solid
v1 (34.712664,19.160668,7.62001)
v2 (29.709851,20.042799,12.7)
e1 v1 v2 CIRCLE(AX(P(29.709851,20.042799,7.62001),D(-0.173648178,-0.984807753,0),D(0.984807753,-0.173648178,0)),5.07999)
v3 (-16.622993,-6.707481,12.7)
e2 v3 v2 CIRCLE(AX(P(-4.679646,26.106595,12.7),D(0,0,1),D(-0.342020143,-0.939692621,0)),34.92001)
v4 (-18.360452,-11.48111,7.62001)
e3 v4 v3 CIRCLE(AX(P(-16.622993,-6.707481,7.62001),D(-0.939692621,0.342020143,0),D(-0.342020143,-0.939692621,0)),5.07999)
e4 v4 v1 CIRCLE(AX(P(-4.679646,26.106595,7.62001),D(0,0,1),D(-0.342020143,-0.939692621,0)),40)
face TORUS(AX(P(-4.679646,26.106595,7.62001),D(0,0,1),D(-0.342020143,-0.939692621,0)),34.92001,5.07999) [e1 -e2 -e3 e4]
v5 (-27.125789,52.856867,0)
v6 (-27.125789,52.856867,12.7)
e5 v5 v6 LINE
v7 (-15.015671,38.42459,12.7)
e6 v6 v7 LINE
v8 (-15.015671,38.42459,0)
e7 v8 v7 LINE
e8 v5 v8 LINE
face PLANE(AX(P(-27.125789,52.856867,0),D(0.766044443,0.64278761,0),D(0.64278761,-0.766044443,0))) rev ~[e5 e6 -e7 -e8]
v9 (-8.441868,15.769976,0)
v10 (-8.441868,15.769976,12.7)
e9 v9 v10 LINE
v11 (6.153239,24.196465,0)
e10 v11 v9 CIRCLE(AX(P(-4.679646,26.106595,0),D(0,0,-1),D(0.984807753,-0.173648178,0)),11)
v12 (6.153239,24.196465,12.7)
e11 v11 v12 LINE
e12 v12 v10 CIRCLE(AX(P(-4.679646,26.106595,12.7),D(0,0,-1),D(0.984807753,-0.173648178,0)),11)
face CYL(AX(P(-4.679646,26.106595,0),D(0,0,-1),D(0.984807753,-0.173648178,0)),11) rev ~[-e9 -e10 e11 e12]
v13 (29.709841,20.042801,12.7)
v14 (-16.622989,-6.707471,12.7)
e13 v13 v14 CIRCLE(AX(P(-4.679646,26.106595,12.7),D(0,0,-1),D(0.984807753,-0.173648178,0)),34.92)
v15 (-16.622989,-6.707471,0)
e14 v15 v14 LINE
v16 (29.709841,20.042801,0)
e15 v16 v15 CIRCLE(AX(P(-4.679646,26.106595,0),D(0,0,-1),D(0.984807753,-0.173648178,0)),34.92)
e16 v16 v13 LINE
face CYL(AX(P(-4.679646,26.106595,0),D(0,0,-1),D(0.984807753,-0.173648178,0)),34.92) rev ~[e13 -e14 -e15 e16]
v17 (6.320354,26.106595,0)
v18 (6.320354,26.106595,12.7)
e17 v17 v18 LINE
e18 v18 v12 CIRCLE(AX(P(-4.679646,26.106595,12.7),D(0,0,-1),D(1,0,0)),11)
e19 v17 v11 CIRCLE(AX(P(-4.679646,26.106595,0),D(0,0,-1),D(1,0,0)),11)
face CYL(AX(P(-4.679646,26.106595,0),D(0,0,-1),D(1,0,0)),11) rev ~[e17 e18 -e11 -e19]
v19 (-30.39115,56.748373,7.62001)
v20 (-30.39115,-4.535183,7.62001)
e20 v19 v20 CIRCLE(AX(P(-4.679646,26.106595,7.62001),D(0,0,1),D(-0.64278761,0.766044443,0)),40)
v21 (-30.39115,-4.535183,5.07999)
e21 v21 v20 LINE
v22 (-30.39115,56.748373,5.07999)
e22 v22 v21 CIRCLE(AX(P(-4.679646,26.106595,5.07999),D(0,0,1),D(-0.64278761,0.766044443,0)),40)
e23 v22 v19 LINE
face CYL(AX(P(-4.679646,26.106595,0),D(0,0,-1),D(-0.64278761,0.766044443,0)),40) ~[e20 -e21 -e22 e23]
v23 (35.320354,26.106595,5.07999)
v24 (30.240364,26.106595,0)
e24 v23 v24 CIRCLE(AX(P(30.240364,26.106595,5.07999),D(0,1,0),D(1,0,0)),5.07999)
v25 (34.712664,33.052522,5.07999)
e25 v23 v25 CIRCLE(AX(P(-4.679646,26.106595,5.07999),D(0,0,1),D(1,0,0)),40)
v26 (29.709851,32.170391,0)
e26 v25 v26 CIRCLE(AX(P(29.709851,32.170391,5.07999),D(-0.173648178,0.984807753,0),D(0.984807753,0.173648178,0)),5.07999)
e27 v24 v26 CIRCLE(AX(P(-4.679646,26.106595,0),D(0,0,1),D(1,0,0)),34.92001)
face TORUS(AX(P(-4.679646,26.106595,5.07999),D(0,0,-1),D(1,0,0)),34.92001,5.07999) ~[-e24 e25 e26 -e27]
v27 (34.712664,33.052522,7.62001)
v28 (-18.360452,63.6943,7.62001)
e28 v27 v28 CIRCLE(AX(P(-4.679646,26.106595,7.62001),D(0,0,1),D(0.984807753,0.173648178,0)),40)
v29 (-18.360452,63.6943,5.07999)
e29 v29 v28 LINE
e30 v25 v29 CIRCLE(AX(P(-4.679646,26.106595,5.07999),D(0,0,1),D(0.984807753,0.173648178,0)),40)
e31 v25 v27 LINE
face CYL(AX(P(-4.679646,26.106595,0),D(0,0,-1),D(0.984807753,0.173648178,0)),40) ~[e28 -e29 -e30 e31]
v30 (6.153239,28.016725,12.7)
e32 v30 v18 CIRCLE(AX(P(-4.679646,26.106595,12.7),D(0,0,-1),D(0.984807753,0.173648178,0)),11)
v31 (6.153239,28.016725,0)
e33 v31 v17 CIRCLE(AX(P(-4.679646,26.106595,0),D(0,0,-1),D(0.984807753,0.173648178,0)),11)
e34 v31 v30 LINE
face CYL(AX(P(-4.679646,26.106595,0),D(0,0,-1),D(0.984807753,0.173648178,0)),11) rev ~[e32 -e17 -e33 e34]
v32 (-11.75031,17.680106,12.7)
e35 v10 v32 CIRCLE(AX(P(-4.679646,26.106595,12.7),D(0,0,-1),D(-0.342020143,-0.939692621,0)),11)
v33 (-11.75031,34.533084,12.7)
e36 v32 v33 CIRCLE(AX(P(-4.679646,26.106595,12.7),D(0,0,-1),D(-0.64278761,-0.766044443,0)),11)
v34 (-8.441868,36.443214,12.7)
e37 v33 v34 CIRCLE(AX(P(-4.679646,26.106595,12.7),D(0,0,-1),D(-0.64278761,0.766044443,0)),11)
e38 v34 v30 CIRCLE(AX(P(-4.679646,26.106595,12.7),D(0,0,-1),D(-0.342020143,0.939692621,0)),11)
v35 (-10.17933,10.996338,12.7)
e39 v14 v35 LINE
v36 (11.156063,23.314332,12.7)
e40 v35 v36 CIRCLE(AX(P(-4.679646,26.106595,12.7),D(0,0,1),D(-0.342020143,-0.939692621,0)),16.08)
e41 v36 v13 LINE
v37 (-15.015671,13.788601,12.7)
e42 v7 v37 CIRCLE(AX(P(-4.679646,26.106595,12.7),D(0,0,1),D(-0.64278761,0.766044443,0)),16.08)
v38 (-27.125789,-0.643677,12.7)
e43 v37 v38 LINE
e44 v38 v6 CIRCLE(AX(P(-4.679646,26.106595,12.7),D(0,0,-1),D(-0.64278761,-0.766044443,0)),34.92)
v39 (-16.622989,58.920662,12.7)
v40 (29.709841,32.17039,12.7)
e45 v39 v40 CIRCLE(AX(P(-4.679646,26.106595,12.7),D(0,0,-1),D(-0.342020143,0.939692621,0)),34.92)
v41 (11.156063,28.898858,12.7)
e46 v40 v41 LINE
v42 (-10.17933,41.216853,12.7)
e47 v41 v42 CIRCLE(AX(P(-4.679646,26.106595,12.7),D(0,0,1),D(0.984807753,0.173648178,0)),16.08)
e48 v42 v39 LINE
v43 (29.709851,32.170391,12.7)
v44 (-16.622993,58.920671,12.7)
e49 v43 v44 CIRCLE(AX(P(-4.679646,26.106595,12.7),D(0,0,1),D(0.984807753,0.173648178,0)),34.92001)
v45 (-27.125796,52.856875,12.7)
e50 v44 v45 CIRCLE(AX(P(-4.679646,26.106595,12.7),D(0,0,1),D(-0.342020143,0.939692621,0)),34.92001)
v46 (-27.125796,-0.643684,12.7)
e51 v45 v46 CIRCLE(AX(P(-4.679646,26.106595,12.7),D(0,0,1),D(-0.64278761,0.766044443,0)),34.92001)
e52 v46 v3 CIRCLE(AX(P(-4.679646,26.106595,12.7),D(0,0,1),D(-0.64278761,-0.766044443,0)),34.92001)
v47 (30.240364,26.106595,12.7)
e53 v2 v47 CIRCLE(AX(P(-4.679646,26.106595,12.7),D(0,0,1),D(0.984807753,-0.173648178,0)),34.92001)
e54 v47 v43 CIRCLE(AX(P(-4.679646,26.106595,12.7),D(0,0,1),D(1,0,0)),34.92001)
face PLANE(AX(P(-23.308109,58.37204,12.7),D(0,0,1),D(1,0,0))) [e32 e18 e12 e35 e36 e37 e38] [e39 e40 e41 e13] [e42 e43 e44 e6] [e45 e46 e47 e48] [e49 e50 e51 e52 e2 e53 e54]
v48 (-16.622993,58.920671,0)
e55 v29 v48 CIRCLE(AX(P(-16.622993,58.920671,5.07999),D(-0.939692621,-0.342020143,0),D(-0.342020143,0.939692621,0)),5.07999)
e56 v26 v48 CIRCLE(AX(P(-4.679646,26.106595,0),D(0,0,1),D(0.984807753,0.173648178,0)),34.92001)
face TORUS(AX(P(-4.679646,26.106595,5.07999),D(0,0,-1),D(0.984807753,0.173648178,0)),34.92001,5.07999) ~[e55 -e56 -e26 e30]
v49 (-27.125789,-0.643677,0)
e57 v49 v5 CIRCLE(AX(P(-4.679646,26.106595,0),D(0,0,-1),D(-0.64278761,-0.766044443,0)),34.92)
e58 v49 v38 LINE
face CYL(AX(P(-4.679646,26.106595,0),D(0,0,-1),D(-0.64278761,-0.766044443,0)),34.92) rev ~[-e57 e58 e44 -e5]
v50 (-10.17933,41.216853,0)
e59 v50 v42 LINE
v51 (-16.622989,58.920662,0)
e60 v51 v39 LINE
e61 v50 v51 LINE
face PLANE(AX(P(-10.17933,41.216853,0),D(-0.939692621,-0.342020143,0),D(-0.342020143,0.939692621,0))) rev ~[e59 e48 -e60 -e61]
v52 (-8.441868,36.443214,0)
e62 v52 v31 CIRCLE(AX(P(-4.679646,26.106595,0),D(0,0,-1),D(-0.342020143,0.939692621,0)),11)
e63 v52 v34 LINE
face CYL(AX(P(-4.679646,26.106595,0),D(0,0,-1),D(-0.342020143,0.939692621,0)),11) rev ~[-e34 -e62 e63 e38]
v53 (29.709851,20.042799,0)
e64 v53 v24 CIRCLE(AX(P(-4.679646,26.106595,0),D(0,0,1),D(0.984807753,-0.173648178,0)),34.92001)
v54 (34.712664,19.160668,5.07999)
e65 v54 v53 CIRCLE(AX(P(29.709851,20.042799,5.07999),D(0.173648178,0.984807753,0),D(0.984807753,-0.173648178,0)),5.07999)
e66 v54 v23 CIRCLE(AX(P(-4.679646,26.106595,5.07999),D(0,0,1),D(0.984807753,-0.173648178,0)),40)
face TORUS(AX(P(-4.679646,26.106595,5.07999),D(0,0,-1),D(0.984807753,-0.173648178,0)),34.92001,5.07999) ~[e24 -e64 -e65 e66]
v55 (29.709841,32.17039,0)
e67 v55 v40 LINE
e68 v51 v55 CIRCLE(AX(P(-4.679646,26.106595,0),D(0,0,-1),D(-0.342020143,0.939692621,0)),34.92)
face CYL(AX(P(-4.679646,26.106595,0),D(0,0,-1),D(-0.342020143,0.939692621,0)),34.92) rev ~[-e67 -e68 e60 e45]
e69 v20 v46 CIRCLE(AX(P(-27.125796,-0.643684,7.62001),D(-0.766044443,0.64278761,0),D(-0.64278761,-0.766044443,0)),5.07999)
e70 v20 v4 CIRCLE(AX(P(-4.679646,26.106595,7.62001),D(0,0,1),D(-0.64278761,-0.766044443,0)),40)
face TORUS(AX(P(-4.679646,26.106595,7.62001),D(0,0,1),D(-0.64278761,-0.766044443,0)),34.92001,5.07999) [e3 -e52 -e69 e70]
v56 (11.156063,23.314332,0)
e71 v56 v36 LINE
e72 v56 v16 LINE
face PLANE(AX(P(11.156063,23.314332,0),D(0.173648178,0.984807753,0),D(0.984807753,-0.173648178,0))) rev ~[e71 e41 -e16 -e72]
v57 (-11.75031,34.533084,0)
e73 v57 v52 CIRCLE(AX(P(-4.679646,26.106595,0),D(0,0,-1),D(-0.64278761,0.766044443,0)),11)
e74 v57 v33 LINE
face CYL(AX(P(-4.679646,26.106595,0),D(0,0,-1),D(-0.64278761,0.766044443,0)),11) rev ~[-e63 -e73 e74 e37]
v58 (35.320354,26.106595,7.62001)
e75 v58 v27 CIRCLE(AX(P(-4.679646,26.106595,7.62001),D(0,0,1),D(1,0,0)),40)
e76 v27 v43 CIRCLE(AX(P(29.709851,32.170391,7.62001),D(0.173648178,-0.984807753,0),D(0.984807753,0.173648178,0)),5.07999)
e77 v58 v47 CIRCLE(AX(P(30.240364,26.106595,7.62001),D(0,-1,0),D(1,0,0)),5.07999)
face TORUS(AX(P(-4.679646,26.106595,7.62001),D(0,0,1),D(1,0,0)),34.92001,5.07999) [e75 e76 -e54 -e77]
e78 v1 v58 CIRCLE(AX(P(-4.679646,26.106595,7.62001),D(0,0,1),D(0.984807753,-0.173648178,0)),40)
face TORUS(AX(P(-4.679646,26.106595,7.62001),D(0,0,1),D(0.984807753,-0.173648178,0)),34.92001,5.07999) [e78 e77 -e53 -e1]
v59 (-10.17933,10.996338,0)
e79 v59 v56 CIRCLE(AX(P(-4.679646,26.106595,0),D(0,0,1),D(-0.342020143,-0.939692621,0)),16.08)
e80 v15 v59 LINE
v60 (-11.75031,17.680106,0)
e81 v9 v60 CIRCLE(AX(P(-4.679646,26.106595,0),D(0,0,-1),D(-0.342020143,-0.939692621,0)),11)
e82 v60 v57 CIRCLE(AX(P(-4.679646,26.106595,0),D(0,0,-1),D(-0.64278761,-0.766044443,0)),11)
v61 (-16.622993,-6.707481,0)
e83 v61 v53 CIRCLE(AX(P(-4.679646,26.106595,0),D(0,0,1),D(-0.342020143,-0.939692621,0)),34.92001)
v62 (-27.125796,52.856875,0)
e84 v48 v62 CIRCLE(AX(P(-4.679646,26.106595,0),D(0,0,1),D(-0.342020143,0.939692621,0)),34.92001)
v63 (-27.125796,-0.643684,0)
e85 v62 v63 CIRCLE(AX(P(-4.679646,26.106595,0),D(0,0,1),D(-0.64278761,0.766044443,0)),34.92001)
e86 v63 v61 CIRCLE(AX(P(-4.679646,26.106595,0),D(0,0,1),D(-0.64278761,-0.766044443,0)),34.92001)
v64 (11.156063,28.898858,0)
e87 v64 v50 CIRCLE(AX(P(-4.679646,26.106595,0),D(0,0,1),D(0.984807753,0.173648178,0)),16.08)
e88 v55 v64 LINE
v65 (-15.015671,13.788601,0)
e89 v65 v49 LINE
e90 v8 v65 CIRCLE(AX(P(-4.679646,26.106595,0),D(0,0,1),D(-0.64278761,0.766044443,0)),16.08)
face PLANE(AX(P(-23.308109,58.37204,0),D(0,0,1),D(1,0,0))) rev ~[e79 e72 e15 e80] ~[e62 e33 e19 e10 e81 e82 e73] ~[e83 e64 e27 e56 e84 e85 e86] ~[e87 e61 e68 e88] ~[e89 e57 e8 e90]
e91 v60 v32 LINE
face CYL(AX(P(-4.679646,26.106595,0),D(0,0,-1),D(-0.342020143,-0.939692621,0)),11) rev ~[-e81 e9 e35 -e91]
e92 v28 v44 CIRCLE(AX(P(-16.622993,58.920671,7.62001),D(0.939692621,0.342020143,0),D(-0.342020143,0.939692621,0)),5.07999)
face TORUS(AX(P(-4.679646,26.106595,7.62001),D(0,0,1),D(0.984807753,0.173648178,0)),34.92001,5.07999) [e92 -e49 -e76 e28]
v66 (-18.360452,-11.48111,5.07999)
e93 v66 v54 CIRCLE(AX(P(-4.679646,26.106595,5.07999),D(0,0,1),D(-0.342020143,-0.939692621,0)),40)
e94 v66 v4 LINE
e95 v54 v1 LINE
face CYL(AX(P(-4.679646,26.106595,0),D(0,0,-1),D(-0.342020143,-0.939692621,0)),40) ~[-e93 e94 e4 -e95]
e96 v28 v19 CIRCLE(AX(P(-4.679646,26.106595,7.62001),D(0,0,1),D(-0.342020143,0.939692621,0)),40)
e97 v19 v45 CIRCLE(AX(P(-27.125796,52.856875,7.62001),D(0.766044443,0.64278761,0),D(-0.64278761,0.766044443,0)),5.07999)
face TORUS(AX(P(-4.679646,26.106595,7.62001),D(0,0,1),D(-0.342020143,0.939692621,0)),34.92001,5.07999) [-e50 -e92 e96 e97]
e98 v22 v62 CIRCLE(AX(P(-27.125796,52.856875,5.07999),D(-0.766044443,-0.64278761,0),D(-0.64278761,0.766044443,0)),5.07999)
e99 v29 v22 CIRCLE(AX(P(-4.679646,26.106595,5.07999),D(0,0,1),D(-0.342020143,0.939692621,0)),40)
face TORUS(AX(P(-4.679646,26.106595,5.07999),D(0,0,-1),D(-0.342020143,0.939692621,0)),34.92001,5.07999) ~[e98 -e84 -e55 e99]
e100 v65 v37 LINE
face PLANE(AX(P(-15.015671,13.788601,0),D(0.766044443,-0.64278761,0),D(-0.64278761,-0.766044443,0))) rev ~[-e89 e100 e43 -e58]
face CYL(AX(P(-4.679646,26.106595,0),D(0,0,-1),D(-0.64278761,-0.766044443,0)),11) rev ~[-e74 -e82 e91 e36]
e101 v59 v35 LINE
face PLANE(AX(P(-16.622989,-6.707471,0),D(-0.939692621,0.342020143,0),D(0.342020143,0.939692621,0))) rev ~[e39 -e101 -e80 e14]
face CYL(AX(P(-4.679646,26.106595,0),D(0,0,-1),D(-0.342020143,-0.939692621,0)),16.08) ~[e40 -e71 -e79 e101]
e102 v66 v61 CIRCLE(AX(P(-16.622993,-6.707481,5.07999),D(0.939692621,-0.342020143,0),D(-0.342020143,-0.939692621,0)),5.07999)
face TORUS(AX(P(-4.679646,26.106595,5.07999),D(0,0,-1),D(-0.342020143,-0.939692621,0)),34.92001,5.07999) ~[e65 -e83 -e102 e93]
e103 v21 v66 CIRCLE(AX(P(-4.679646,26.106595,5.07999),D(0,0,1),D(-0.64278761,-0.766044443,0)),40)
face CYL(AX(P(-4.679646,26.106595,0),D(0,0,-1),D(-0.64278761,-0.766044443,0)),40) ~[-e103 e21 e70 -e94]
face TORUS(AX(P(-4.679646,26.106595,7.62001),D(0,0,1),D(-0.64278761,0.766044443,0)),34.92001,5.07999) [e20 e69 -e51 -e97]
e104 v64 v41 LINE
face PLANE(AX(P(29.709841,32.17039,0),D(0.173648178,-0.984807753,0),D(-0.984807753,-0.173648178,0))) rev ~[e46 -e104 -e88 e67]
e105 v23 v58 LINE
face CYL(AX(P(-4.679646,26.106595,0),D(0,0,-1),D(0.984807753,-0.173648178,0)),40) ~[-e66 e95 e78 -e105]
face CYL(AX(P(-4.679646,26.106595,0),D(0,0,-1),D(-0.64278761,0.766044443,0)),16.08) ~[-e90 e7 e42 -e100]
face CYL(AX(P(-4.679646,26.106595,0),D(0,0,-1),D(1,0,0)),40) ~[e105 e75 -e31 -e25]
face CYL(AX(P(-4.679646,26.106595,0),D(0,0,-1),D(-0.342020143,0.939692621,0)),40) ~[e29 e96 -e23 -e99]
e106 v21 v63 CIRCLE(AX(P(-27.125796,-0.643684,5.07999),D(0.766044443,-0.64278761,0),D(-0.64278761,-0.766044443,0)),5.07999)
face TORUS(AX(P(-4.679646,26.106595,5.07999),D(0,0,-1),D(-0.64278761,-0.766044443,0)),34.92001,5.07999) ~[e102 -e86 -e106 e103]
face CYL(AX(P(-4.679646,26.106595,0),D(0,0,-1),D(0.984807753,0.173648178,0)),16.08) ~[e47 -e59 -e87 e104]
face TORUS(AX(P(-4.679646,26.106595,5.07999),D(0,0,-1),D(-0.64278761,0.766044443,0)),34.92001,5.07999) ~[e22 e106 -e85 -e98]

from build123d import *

# Parameters (mm, degrees)
F1_DEPTH = 12.7
F2_R     = 5.07999


# Not quite as in the source:
# - a fillet or chamfer is up to 0.001 mm smaller than in the source, because OpenCascade refuses the exact size


with BuildPart() as f1:
    # F0 (on Top) → F1 (new body)
    with BuildSketch(Plane.XY):
        with BuildLine():
            ThreePointArc((-27.1257893014, 52.8568671478), (-22.1396459711, 56.3482022942), (-16.6229893761, 58.9206615119))
            Line((-16.6229893761, 58.9206615119), (-18.3604517042, 63.6943000255))
            ThreePointArc((-18.3604517042, 63.6943000255), (-24.6796459711, 60.7476113455), (-30.3911503586, 56.7483729188))
            Line((-30.3911503586, 56.7483729188), (-27.1257893014, 52.8568671478))
        make_face()
        with BuildLine():
            ThreePointArc((-27.1257893014, -0.6436767596), (-39.5996459711, 26.1065951941), (-27.1257893014, 52.8568671478))
            Line((-27.1257893014, 52.8568671478), (-30.3911503586, 56.7483729188))
            ThreePointArc((-30.3911503586, 56.7483729188), (-44.6796459711, 26.1065951941), (-30.3911503586, -4.5351825307))
            Line((-30.3911503586, -4.5351825307), (-27.1257893014, -0.6436767596))
        make_face()
        with BuildLine():
            Line((-18.3604517042, -11.4811096374), (-16.6229893761, -6.7074711238))
            ThreePointArc((-16.6229893761, -6.7074711238), (-22.1396459711, -4.1350119061), (-27.1257893014, -0.6436767596))
            Line((-27.1257893014, -0.6436767596), (-30.3911503586, -4.5351825307))
            ThreePointArc((-30.3911503586, -4.5351825307), (-24.6796459711, -8.5344209573), (-18.3604517042, -11.4811096374))
        make_face()
        with BuildLine():
            Line((34.7126641494, 19.1606680874), (29.709840764, 20.04280083))
            ThreePointArc((29.709840764, 20.04280083), (12.7803540289, -4.1350119061), (-16.6229893761, -6.7074711238))
            Line((-16.6229893761, -6.7074711238), (-18.3604517042, -11.4811096374))
            ThreePointArc((-18.3604517042, -11.4811096374), (15.3203540289, -8.5344209573), (34.7126641494, 19.1606680874))
        make_face()
        with BuildLine():
            Line((34.7126641494, 33.0525223008), (29.709840764, 32.1703895582))
            ThreePointArc((29.709840764, 32.1703895582), (30.1074728862, 29.1500737308), (30.2403540289, 26.1065951941))
            ThreePointArc((30.2403540289, 26.1065951941), (30.1074728862, 23.0631166573), (29.709840764, 20.04280083))
            Line((29.709840764, 20.04280083), (34.7126641494, 19.1606680874))
            ThreePointArc((34.7126641494, 19.1606680874), (35.1681419525, 22.6203654842), (35.3203540289, 26.1065951941))
            ThreePointArc((35.3203540289, 26.1065951941), (35.1681419525, 29.592824904), (34.7126641494, 33.0525223008))
        make_face()
        with BuildLine():
            ThreePointArc((-15.0156707349, 38.4245898394), (-12.7196459711, 40.0322836869), (-10.1793298758, 41.2168525363))
            Line((-10.1793298758, 41.2168525363), (-16.6229893761, 58.9206615119))
            ThreePointArc((-16.6229893761, 58.9206615119), (-22.1396459711, 56.3482022942), (-27.1257893014, 52.8568671478))
            Line((-27.1257893014, 52.8568671478), (-15.0156707349, 38.4245898394))
        make_face()
        with BuildLine():
            ThreePointArc((-8.4418675477, 36.4432140227), (0.8203540289, 35.6328746357), (6.153239312, 28.0167251484))
            Line((6.153239312, 28.0167251484), (11.1560626973, 28.898857891))
            ThreePointArc((11.1560626973, 28.898857891), (3.3603540289, 40.0322836869), (-10.1793298758, 41.2168525363))
            Line((-10.1793298758, 41.2168525363), (-8.4418675477, 36.4432140227))
        make_face()
        with BuildLine():
            ThreePointArc((-11.7503096777, 17.6801063198), (-15.6796459711, 26.1065951941), (-11.7503096777, 34.5330840684))
            Line((-11.7503096777, 34.5330840684), (-15.0156707349, 38.4245898394))
            ThreePointArc((-15.0156707349, 38.4245898394), (-20.7596459711, 26.1065951941), (-15.0156707349, 13.7886005487))
            Line((-15.0156707349, 13.7886005487), (-11.7503096777, 17.6801063198))
        make_face()
        with BuildLine():
            ThreePointArc((-11.7503096777, 34.5330840684), (-10.1796459711, 35.6328746357), (-8.4418675477, 36.4432140227))
            Line((-8.4418675477, 36.4432140227), (-10.1793298758, 41.2168525363))
            ThreePointArc((-10.1793298758, 41.2168525363), (-12.7196459711, 40.0322836869), (-15.0156707349, 38.4245898394))
            Line((-15.0156707349, 38.4245898394), (-11.7503096777, 34.5330840684))
        make_face()
        with BuildLine():
            Line((11.1560626973, 23.3143324972), (6.153239312, 24.1964652397))
            ThreePointArc((6.153239312, 24.1964652397), (0.8203540289, 16.5803157525), (-8.4418675477, 15.7699763654))
            Line((-8.4418675477, 15.7699763654), (-10.1793298758, 10.9963378518))
            ThreePointArc((-10.1793298758, 10.9963378518), (3.3603540289, 12.1809067012), (11.1560626973, 23.3143324972))
        make_face()
        with BuildLine():
            ThreePointArc((6.153239312, 28.0167251484), (6.2784957079, 27.0653083643), (6.3203540289, 26.1065951941))
            ThreePointArc((6.3203540289, 26.1065951941), (6.2784957079, 25.1478820239), (6.153239312, 24.1964652397))
            Line((6.153239312, 24.1964652397), (11.1560626973, 23.3143324972))
            ThreePointArc((11.1560626973, 23.3143324972), (11.3391647742, 24.7051308507), (11.4003540289, 26.1065951941))
            ThreePointArc((11.4003540289, 26.1065951941), (11.3391647742, 27.5080595375), (11.1560626973, 28.898857891))
            Line((11.1560626973, 28.898857891), (6.153239312, 28.0167251484))
        make_face()
        with BuildLine():
            Line((-10.1793298758, 10.9963378518), (-8.4418675477, 15.7699763654))
            ThreePointArc((-8.4418675477, 15.7699763654), (-10.1796459711, 16.5803157525), (-11.7503096777, 17.6801063198))
            Line((-11.7503096777, 17.6801063198), (-15.0156707349, 13.7886005487))
            ThreePointArc((-15.0156707349, 13.7886005487), (-12.7196459711, 12.1809067012), (-10.1793298758, 10.9963378518))
        make_face()
        with BuildLine():
            ThreePointArc((-16.6229893761, 58.9206615119), (12.7803540289, 56.3482022942), (29.709840764, 32.1703895582))
            Line((29.709840764, 32.1703895582), (34.7126641494, 33.0525223008))
            ThreePointArc((34.7126641494, 33.0525223008), (15.3203540289, 60.7476113455), (-18.3604517042, 63.6943000255))
            Line((-18.3604517042, 63.6943000255), (-16.6229893761, 58.9206615119))
        make_face()
        with BuildLine():
            Line((29.709840764, 32.1703895582), (11.1560626973, 28.898857891))
            ThreePointArc((11.1560626973, 28.898857891), (11.3391647742, 27.5080595375), (11.4003540289, 26.1065951941))
            ThreePointArc((11.4003540289, 26.1065951941), (11.3391647742, 24.7051308507), (11.1560626973, 23.3143324972))
            Line((11.1560626973, 23.3143324972), (29.709840764, 20.04280083))
            ThreePointArc((29.709840764, 20.04280083), (30.1074728862, 23.0631166573), (30.2403540289, 26.1065951941))
            ThreePointArc((30.2403540289, 26.1065951941), (30.1074728862, 29.1500737308), (29.709840764, 32.1703895582))
        make_face()
        with BuildLine():
            Line((-16.6229893761, -6.7074711238), (-10.1793298758, 10.9963378518))
            ThreePointArc((-10.1793298758, 10.9963378518), (-12.7196459711, 12.1809067012), (-15.0156707349, 13.7886005487))
            Line((-15.0156707349, 13.7886005487), (-27.1257893014, -0.6436767596))
            ThreePointArc((-27.1257893014, -0.6436767596), (-22.1396459711, -4.1350119061), (-16.6229893761, -6.7074711238))
        make_face()
    extrude(amount=F1_DEPTH)

    # F2 (radius 5.08 in the source; OpenCascade refuses exactly that, so slightly less here)
    f2_edges = [f1.edges().sort_by_distance(p)[0] for p in [
        (-44.071956, 19.160668, 12.7),
        (-44.071956, 19.160668, 0),
    ]]
    fillet(f2_edges, radius=F2_R)


solid = f1.part
